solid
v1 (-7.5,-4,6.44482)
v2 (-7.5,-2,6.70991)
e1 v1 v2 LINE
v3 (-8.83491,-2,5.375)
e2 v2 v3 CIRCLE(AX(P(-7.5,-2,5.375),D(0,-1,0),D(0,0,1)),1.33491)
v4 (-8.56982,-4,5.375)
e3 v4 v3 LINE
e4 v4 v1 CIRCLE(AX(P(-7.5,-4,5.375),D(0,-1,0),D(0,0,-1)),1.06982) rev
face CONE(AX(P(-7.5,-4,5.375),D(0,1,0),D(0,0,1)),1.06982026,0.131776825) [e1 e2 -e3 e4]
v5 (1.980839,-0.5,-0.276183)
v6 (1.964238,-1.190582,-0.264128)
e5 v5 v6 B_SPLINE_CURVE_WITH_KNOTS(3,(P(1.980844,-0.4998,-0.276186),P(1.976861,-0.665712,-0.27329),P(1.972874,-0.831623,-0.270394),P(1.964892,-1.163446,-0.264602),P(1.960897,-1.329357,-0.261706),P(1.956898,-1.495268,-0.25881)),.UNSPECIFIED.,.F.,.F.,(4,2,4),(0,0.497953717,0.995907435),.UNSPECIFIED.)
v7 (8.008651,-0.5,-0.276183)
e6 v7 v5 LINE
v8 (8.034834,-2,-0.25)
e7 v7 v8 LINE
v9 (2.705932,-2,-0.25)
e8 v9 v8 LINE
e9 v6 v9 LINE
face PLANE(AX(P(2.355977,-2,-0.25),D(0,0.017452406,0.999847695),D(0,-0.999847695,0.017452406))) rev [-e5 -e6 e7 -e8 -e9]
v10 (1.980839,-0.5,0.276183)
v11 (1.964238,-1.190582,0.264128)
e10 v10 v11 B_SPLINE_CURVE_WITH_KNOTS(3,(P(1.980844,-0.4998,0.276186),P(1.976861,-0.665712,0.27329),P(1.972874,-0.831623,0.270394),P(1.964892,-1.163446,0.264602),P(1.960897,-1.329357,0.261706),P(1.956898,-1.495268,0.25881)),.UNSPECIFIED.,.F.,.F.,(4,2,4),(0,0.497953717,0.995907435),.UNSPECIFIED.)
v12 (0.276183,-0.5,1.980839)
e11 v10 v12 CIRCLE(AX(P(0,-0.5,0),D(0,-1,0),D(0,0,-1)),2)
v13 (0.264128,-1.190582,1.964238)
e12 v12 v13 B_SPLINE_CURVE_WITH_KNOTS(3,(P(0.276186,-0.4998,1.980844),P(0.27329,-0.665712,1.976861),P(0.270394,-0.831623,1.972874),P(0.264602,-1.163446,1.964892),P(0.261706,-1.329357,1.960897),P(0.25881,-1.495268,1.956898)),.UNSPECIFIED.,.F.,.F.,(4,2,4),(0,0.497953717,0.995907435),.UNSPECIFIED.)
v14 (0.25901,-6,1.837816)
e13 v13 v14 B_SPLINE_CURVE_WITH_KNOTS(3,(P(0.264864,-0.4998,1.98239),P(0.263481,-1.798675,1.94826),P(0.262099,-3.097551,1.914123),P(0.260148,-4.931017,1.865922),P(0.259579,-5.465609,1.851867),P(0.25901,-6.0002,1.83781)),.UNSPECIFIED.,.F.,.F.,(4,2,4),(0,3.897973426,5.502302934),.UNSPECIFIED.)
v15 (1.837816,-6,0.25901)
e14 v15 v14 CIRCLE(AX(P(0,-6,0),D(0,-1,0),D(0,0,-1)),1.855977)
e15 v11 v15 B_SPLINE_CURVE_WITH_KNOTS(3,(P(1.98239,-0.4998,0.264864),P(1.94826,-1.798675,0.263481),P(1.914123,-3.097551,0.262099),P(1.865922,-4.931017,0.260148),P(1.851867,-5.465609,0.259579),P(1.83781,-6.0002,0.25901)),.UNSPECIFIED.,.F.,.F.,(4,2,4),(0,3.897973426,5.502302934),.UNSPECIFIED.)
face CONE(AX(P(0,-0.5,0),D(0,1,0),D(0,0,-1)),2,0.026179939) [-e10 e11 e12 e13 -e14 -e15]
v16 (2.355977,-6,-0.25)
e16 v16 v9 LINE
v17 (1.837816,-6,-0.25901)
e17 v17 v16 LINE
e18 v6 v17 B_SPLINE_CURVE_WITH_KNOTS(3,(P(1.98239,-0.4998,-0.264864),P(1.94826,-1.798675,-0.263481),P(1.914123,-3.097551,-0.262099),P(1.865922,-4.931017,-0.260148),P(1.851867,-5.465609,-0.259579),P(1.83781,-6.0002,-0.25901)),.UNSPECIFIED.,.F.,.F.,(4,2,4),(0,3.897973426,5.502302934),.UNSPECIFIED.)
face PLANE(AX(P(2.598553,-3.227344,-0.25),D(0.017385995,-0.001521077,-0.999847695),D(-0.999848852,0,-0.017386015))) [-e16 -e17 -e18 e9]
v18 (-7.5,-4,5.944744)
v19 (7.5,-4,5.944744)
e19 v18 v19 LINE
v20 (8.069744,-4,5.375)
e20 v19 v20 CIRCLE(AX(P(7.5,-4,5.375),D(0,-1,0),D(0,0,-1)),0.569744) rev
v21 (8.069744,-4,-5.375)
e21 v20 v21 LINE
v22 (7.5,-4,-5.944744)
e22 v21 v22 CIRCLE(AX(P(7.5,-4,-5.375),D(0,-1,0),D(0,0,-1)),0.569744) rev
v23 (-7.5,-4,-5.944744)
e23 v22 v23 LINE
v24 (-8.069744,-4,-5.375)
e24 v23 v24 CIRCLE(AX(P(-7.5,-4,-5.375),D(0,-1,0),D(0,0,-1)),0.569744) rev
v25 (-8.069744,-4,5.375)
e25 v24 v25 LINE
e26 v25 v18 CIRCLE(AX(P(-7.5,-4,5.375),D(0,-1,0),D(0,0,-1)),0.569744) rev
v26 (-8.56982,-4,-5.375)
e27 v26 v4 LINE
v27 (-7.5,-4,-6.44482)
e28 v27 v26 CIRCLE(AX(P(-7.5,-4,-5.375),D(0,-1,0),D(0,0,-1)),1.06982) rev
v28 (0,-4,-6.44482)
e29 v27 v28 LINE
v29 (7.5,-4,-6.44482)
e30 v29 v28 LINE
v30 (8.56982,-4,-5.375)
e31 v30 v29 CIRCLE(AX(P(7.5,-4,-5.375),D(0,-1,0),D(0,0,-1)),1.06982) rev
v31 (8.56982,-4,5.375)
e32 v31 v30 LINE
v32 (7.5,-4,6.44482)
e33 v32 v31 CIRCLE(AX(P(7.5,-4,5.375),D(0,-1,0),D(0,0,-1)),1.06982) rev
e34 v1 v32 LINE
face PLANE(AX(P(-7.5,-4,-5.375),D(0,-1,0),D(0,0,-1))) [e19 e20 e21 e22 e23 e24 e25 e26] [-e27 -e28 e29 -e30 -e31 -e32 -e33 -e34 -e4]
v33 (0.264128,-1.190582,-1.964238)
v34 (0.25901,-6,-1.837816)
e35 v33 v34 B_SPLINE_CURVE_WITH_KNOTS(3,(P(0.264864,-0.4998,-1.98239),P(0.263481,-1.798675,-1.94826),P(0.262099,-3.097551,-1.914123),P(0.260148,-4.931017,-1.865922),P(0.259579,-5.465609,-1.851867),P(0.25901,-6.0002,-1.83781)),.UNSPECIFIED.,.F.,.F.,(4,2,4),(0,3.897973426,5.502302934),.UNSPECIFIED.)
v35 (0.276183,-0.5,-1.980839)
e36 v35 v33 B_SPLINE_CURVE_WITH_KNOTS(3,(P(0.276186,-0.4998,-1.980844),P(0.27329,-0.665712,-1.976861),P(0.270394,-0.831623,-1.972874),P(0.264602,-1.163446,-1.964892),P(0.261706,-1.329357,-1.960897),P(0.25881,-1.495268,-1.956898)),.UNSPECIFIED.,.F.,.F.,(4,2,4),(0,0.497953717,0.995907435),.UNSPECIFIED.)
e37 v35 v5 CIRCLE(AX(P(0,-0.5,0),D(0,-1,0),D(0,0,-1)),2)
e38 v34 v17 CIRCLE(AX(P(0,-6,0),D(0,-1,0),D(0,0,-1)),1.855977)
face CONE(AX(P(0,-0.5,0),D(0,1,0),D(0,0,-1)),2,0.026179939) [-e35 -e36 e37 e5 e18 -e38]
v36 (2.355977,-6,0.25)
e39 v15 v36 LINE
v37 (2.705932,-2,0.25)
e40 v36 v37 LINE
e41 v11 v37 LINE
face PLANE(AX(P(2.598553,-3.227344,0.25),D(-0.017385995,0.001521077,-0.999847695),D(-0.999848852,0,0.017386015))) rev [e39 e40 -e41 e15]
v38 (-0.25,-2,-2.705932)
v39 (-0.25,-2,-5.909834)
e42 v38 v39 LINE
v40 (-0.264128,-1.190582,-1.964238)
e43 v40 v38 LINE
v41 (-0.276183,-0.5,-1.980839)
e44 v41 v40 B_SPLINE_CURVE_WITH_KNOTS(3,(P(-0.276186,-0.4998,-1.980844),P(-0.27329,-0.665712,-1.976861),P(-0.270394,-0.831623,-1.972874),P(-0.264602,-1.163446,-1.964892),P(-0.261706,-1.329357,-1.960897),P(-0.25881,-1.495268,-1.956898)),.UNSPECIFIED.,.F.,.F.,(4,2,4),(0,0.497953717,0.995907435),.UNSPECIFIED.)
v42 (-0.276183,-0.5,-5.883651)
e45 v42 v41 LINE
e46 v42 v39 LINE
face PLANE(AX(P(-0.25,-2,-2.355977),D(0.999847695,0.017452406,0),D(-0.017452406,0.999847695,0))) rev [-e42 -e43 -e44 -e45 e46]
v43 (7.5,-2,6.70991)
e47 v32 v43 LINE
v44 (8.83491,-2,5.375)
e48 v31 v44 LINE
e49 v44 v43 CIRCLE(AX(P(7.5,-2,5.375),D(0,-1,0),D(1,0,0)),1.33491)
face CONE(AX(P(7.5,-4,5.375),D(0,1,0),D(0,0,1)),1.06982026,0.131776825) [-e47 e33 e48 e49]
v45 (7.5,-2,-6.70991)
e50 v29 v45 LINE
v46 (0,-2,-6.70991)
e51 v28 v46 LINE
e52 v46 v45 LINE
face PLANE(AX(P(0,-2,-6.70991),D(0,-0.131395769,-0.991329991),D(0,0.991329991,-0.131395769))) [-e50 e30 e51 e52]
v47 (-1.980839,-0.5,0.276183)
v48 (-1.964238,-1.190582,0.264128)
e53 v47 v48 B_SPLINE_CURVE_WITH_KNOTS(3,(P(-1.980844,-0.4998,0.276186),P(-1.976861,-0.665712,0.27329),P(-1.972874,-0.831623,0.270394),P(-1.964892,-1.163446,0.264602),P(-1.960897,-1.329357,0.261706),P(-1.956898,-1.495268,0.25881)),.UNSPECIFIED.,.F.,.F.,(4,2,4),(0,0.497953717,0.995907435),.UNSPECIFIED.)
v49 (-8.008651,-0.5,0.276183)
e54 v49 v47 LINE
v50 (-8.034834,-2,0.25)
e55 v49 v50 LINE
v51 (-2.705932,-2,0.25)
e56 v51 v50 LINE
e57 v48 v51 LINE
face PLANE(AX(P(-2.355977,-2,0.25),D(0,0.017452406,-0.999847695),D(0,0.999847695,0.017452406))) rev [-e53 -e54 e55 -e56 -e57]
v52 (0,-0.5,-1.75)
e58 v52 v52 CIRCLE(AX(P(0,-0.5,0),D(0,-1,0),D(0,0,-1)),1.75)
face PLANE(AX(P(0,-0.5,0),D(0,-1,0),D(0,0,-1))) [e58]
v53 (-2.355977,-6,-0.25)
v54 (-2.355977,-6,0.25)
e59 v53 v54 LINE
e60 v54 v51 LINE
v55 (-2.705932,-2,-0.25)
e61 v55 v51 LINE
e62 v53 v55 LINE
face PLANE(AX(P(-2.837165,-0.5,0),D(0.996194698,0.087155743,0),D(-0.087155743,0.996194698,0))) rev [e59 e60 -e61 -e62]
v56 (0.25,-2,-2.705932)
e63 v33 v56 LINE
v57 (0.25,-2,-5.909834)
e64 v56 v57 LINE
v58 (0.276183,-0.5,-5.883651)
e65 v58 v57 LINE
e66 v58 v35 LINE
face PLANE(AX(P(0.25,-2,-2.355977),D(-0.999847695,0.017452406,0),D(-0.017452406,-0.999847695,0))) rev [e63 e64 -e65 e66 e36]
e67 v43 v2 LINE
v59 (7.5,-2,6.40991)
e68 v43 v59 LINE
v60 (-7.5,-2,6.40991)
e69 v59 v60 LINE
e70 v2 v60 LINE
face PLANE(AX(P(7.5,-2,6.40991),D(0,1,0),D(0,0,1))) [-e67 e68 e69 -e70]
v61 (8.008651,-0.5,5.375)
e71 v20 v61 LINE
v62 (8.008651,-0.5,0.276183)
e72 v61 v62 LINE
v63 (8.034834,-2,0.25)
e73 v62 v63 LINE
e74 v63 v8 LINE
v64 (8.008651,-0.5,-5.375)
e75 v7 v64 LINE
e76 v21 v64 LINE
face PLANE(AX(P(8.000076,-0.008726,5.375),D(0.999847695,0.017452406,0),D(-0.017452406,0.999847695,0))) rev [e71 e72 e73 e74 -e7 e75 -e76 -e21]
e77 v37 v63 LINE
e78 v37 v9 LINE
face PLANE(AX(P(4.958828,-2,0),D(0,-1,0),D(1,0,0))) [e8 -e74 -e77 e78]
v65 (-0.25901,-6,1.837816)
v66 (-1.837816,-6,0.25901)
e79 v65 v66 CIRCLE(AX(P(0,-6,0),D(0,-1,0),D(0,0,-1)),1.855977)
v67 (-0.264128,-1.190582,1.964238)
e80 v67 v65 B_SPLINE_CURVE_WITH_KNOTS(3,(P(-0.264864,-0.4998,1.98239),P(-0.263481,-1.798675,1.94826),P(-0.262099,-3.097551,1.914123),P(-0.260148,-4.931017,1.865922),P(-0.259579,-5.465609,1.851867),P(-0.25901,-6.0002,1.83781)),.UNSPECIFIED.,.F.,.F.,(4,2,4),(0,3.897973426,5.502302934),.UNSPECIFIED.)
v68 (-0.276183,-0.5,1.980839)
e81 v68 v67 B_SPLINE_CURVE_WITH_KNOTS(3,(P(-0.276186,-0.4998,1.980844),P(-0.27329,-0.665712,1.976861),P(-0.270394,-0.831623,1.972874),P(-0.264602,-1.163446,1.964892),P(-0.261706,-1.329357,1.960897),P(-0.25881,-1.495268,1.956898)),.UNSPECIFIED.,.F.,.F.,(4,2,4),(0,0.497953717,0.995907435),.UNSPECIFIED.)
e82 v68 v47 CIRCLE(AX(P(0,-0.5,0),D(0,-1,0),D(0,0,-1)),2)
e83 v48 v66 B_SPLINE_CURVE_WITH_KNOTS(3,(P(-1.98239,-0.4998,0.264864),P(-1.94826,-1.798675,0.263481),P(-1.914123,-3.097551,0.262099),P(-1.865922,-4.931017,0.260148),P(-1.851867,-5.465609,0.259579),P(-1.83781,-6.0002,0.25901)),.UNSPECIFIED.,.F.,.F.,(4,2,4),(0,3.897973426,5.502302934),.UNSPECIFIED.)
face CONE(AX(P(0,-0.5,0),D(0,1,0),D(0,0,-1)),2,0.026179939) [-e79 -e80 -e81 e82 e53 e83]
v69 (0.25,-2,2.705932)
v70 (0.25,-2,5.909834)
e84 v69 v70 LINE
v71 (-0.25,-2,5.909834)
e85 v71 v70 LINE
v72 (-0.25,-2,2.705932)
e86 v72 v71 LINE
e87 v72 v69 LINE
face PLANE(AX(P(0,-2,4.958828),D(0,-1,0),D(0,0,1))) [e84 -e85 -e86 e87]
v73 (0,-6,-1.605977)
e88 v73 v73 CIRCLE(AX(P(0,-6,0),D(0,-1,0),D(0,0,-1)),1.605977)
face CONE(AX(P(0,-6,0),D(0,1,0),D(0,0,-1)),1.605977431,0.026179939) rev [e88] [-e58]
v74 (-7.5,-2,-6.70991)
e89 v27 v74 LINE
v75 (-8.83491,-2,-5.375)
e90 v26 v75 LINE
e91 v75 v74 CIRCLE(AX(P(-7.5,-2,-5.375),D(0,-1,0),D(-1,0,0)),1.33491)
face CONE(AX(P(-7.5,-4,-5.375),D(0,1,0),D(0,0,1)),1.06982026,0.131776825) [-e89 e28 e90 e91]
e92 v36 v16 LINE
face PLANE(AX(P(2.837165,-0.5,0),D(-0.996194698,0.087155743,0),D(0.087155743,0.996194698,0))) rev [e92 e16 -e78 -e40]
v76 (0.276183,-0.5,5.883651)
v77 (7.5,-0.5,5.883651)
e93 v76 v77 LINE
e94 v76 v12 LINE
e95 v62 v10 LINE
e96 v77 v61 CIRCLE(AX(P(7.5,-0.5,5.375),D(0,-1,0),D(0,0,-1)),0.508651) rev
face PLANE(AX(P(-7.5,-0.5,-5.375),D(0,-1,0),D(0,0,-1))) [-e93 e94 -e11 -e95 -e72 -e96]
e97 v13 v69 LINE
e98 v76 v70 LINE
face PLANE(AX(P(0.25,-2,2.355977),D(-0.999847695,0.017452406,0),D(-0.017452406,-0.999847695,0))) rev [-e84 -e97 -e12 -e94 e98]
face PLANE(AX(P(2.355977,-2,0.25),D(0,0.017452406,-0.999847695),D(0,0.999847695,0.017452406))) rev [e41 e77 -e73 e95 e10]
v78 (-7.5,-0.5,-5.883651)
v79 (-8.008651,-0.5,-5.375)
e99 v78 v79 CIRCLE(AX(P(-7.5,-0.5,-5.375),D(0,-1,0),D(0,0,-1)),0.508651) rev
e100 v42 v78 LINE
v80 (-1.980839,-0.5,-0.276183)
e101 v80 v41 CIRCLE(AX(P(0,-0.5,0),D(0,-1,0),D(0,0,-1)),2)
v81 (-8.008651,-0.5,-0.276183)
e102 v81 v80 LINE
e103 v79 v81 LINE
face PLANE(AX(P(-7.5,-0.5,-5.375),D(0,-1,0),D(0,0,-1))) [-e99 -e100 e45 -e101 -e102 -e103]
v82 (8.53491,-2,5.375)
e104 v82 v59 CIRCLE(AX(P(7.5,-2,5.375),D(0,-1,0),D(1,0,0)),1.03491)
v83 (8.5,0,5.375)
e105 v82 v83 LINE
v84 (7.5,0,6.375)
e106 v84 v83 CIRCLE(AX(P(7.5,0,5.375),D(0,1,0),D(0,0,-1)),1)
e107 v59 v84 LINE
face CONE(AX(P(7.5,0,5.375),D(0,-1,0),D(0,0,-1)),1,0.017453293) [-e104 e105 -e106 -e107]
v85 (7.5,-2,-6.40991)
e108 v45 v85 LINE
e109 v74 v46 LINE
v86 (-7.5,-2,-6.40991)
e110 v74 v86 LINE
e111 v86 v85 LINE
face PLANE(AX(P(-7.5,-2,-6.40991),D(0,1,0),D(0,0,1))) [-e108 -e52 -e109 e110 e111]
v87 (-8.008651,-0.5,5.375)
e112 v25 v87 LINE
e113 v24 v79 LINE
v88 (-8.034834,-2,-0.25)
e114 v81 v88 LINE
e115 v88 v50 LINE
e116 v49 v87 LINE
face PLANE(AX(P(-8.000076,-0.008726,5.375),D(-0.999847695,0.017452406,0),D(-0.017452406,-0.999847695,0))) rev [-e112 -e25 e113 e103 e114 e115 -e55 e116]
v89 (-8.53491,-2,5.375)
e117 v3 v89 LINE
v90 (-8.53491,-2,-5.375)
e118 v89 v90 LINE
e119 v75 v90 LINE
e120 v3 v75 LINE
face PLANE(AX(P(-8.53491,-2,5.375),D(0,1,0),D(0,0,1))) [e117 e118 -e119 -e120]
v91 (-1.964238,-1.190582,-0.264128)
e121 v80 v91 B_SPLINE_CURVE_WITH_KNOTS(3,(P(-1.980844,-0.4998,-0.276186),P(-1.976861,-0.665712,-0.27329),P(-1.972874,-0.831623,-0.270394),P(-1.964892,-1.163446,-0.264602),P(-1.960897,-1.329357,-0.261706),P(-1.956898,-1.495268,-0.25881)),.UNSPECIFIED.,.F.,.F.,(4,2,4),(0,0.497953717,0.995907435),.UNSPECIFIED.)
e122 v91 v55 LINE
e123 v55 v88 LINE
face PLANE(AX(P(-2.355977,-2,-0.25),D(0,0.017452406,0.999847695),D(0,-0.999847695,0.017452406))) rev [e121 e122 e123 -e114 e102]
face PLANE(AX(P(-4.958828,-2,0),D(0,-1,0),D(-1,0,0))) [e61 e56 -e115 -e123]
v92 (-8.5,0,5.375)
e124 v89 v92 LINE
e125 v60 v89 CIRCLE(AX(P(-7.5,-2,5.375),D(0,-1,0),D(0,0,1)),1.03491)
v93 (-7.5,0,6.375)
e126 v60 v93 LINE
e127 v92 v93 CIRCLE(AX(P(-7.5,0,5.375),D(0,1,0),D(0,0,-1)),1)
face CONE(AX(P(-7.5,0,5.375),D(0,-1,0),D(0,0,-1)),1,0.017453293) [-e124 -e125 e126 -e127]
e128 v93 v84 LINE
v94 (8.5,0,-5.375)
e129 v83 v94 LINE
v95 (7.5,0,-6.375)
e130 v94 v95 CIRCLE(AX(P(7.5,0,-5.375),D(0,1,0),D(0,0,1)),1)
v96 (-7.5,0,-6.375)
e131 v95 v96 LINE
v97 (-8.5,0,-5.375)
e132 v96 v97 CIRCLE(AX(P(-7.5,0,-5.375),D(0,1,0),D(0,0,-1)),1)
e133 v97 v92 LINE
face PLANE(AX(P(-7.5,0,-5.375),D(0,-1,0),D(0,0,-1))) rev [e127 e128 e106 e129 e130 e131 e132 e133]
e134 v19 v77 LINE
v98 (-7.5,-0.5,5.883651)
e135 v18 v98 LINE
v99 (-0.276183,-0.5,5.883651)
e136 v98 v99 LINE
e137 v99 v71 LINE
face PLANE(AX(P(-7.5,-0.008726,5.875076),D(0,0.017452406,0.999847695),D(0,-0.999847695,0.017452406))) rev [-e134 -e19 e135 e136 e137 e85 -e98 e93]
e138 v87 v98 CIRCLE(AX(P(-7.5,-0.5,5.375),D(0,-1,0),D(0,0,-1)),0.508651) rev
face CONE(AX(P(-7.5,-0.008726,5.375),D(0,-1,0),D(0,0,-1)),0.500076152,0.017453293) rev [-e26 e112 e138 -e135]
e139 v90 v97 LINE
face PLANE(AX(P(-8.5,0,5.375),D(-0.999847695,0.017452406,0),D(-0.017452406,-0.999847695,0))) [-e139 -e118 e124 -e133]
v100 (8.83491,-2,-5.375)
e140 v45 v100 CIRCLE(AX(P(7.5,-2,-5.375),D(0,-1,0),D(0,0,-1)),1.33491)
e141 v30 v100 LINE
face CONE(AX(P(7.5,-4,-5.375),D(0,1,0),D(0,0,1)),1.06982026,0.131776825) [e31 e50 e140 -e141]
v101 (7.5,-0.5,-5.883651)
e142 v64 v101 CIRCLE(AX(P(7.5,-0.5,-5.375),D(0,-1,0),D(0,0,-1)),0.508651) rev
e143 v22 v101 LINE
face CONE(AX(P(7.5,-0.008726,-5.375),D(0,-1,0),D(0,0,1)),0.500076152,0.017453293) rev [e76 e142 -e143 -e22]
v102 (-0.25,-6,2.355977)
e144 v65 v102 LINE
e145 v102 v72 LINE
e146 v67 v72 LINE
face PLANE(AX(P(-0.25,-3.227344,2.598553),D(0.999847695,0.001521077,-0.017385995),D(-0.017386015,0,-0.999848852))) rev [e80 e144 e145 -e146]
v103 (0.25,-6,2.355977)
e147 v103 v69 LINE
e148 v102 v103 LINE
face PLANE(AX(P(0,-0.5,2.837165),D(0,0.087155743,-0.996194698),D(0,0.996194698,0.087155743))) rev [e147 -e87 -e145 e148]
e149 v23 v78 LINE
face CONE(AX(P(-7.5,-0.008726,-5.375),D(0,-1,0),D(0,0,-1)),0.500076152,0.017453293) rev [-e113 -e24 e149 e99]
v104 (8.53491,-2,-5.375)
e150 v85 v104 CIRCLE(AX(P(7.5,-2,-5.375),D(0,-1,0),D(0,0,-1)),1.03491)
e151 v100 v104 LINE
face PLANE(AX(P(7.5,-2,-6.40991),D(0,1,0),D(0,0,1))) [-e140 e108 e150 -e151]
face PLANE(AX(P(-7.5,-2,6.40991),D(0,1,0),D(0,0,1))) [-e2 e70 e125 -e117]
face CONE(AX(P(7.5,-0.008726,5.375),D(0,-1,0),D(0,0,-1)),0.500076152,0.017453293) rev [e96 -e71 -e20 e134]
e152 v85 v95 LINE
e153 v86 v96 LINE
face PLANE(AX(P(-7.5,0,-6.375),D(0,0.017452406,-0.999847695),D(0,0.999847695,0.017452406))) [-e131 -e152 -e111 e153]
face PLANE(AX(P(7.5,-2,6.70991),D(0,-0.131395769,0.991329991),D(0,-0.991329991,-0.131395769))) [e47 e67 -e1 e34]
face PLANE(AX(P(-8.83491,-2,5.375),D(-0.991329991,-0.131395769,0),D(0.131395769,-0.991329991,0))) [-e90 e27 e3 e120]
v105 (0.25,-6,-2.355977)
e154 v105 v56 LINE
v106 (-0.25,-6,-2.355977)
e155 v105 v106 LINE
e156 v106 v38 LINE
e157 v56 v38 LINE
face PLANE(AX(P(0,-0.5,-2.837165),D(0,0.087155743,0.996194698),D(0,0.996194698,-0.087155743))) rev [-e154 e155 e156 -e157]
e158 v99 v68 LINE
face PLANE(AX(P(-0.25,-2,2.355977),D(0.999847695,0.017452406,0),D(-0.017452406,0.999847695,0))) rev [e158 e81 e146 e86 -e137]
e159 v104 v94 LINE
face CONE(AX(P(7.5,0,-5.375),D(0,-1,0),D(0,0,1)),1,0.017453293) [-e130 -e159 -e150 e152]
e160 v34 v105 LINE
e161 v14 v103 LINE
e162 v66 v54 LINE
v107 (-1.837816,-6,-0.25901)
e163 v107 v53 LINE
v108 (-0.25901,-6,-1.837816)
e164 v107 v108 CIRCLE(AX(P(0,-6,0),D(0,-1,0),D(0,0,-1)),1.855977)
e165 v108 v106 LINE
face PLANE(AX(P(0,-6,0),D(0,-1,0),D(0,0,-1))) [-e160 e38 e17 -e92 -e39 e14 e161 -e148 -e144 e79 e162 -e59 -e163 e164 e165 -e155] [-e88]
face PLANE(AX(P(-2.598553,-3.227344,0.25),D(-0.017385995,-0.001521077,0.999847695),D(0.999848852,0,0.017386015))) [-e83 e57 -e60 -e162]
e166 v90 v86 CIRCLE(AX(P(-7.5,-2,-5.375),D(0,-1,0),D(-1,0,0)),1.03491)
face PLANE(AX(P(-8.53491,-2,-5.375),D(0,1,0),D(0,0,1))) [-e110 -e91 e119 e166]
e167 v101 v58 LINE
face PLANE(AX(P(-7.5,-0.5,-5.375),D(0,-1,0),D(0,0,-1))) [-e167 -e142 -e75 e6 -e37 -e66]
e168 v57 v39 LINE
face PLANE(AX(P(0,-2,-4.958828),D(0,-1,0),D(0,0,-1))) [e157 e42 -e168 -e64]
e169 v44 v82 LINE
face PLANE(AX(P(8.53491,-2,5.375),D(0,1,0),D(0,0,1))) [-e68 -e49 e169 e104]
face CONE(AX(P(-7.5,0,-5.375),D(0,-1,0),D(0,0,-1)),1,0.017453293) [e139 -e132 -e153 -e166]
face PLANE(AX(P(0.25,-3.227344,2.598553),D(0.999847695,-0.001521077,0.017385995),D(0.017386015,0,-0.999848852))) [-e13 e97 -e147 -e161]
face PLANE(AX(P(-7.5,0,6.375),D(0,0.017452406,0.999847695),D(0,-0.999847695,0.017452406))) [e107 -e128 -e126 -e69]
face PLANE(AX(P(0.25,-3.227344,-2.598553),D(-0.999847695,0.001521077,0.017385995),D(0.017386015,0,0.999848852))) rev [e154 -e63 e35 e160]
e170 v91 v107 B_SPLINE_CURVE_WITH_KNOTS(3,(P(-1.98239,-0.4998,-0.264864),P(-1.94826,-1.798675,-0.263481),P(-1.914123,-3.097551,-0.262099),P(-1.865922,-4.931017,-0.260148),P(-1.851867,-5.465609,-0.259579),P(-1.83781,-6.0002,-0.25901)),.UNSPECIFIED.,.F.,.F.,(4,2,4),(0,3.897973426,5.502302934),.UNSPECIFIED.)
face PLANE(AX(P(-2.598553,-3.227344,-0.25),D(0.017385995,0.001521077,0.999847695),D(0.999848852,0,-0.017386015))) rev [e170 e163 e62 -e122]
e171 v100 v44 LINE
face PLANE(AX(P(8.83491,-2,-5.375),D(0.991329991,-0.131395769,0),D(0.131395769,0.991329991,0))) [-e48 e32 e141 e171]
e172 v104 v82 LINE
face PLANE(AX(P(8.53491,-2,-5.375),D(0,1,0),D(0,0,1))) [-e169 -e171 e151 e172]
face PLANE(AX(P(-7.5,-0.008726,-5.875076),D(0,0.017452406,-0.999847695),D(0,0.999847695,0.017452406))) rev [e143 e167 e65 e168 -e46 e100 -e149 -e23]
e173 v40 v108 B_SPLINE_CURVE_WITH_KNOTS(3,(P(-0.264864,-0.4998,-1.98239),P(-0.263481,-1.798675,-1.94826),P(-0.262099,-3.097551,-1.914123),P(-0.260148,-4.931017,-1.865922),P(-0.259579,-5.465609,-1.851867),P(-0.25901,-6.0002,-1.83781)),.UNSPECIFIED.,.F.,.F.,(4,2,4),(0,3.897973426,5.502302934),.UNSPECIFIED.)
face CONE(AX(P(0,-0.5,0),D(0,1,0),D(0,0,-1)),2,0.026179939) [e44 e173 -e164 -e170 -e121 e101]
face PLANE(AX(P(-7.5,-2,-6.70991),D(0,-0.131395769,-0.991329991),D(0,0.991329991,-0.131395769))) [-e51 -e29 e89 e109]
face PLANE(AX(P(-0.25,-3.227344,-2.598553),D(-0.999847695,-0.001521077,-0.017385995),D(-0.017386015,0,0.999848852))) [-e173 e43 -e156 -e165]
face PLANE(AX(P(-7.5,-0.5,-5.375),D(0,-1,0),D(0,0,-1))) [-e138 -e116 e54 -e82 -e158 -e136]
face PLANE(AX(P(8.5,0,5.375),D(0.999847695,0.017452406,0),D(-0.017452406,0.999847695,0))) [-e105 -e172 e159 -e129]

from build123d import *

# Parameters (mm, degrees)
BOSS_EXTRUDE1_DEPTH = 4
BOSS_EXTRUDE1_DRAFT = 1
SHELL1_T            = -0.5
SKETCH2_R           = 2
BOSS_EXTRUDE2_DEPTH = 5.5
BOSS_EXTRUDE2_TAPER = 1.5
CIRPATTERN1_COUNT   = 4
SKETCH4_R           = 1.605977431
CUT_EXTRUDE1_DEPTH  = 5.5
CUT_EXTRUDE1_DRAFT  = 1.5
RIB2_START          = -8.069744096
RIB2_DEPTH          = 6.231928651
RIB2_START_2        = 1.837815445
RIB2_2_DEPTH        = 6.231928651
RIB2_START_3        = -5.944744096
RIB2_3_DEPTH        = 4.106928651
RIB2_4_DEPTH        = 4.106928651


with BuildPart() as part:
    # Sketch1 → Boss-Extrude1 (with draft: the straight prism first)
    with BuildSketch(Plane(origin=(0, 0, 0), x_dir=(1, 0, 0), z_dir=(0, 1, 0))):
        with BuildLine():
            Line((-7.5, -6.375), (7.5, -6.375))
            ThreePointArc((7.5, -6.375), (8.207106781, -6.082106781), (8.5, -5.375))
            Line((8.5, -5.375), (8.5, 5.375))
            ThreePointArc((8.5, 5.375), (8.207106781, 6.082106781), (7.5, 6.375))
            Line((7.5, 6.375), (-7.5, 6.375))
            ThreePointArc((-7.5, 6.375), (-8.207106781, 6.082106781), (-8.5, 5.375))
            Line((-8.5, 5.375), (-8.5, -5.375))
            ThreePointArc((-8.5, -5.375), (-8.207106781, -6.082106781), (-7.5, -6.375))
        make_face()
    extrude(amount=-BOSS_EXTRUDE1_DEPTH)
    # Boss-Extrude1: the draft: its side faces are tilted about the plane it starts from
    boss_extrude1_sides = [part.faces().sort_by_distance(p)[0] for p in [
        (0, -2, 6.375),
        (8.207106781, -2, 6.082106781),
        (8.5, -2, 0),
        (8.207106781, -2, -6.082106781),
        (0, -2, -6.375),
        (-8.207106781, -2, -6.082106781),
        (-8.5, -2, 0),
        (-8.207106781, -2, 6.082106781),
    ]]
    draft(boss_extrude1_sides, Plane(origin=(0, 0, 0), x_dir=(1, 0, 0), z_dir=(0, 1, 0)), BOSS_EXTRUDE1_DRAFT)

    # Shell1
    shell1_openings = [part.faces().sort_by_distance(p)[0] for p in [
        (0, -4, 0),
    ]]
    offset(amount=SHELL1_T, openings=shell1_openings, kind=Kind.INTERSECTION)

    # Sketch2 → Boss-Extrude2 (add)
    with BuildSketch(Plane.XZ.offset(0.5)):
        Circle(SKETCH2_R)
    extrude(amount=BOSS_EXTRUDE2_DEPTH, taper=BOSS_EXTRUDE2_TAPER)

    # Rib1: read off the stored shape, not the designer's step
    # Rib1: loft between two sections, ruled curve by curve
    rib1_from = [
        Edge.make_line((-1.982384256, -0.5, 0.264863479), (-2.837165081, -0.5, 0.25)),
        Edge.make_line((-2.837165081, -0.5, -0.25), (-1.982384256, -0.5, -0.264863479)),
        Edge.make_line((-2.837165081, -0.5, -0.25), (-2.837165081, -0.5, 0.25)),
        Edge.make_line((-1.982384256, -0.5, -0.264863479), (-1.982384256, -0.5, 0.264863479)),
    ]
    rib1_to = [
        Edge.make_line((-1.837815545, -6, 0.259010132), (-2.355977431, -6, 0.25)),
        Edge.make_line((-2.355977431, -6, -0.25), (-1.837815545, -6, -0.259010132)),
        Edge.make_line((-2.355977431, -6, -0.25), (-2.355977431, -6, 0.25)),
        Edge.make_line((-1.837815545, -6, -0.259010132), (-1.837815545, -6, 0.259010132)),
    ]
    rib1 = Solid(Shell([*[Face.make_surface_from_curves(rib1_from[k], rib1_to[k]) for k in range(4)], Face(Wire(rib1_from)), Face(Wire(rib1_to))]))
    add(rib1)

    # CirPattern1: Rib1 ×4 about axis
    cirpattern1_axis = Axis((0, 0, 0), (0, 1, 0))
    for i in range(1, CIRPATTERN1_COUNT):
        add(rib1.rotate(cirpattern1_axis, i * 360 / CIRPATTERN1_COUNT))


with BuildPart() as cut_extrude1_tool:
    # Sketch4 → Cut-Extrude1 (with draft: the straight prism first)
    with BuildSketch(Plane.XZ.offset(6)):
        Circle(SKETCH4_R)
    extrude(amount=-CUT_EXTRUDE1_DEPTH)
    # Cut-Extrude1: the draft: its side faces are tilted about the plane it starts from
    cut_extrude1_sides = [cut_extrude1_tool.faces().sort_by_distance(p)[0] for p in [
        (-1.605977431, -3.25, 0),
    ]]
    draft(cut_extrude1_sides, Plane.XZ.offset(6), CUT_EXTRUDE1_DRAFT)


with BuildPart() as part_1:
    add(part.part)

    # Cut-Extrude1: cut by cut_extrude1_tool
    add(cut_extrude1_tool.part, mode=Mode.SUBTRACT)

    # Sweep1: sweep along a path in Sketch6
    with BuildLine(Plane(origin=(0, -2, 0), x_dir=(1, 0, 0), z_dir=(0, 1, 0))) as sweep1_path:
        Line((-8.56982026, 5.375), (-8.56982026, -5.375))
        ThreePointArc((-8.56982026, -5.375), (-8.25647716, -6.13147716), (-7.5, -6.44482026))
        Line((-7.5, -6.44482026), (7.5, -6.44482026))
        ThreePointArc((7.5, -6.44482026), (8.25647716, -6.13147716), (8.56982026, -5.375))
        Line((8.56982026, -5.375), (8.56982026, 5.375))
        ThreePointArc((8.56982026, 5.375), (8.25647716, 6.13147716), (7.5, 6.44482026))
        Line((7.5, 6.44482026), (-7.5, 6.44482026))
        ThreePointArc((-7.5, 6.44482026), (-8.25647716, 6.13147716), (-8.56982026, 5.375))
    # Sketch5 → Sweep1 (sweep)
    with BuildSketch(Plane(origin=(0, 0, 0), x_dir=(0, 0, -1), z_dir=(1, 0, 0))):
        Polygon((6.44482026, -4), (6.40991013, -2), (6.70991013, -2), align=None)
    sweep(path=sweep1_path.line)

    # Rib2: read off the stored shape, not the designer's step
    # Rib2 outline → Rib2 (add)
    with BuildSketch(Plane.YZ.offset(RIB2_START)):
        Polygon((-2, -0.25), (-0.5, -0.276182597), (-0.5, 0.276182597), (-2, 0.25), align=None)
    extrude(amount=RIB2_DEPTH)

    # Rib2 2 outline → Rib2 2 (add)
    with BuildSketch(Plane.YZ.offset(RIB2_START_2)):
        Polygon((-2, -0.25), (-0.5, -0.276182597), (-0.5, 0.276182597), (-2, 0.25), align=None)
    extrude(amount=RIB2_2_DEPTH)

    # Rib2 3 outline → Rib2 3 (add)
    with BuildSketch(Plane.XY.offset(RIB2_START_3)):
        Polygon((-0.276182597, -0.5), (-0.25, -2), (0.25, -2), (0.276182597, -0.5), align=None)
    extrude(amount=RIB2_3_DEPTH)

    # Rib2 4 outline → Rib2 4 (add)
    with BuildSketch(Plane.XY.offset(RIB2_START_2)):
        Polygon((-0.276182597, -0.5), (-0.25, -2), (0.25, -2), (0.276182597, -0.5), align=None)
    extrude(amount=RIB2_4_DEPTH)


solid = part_1.part
